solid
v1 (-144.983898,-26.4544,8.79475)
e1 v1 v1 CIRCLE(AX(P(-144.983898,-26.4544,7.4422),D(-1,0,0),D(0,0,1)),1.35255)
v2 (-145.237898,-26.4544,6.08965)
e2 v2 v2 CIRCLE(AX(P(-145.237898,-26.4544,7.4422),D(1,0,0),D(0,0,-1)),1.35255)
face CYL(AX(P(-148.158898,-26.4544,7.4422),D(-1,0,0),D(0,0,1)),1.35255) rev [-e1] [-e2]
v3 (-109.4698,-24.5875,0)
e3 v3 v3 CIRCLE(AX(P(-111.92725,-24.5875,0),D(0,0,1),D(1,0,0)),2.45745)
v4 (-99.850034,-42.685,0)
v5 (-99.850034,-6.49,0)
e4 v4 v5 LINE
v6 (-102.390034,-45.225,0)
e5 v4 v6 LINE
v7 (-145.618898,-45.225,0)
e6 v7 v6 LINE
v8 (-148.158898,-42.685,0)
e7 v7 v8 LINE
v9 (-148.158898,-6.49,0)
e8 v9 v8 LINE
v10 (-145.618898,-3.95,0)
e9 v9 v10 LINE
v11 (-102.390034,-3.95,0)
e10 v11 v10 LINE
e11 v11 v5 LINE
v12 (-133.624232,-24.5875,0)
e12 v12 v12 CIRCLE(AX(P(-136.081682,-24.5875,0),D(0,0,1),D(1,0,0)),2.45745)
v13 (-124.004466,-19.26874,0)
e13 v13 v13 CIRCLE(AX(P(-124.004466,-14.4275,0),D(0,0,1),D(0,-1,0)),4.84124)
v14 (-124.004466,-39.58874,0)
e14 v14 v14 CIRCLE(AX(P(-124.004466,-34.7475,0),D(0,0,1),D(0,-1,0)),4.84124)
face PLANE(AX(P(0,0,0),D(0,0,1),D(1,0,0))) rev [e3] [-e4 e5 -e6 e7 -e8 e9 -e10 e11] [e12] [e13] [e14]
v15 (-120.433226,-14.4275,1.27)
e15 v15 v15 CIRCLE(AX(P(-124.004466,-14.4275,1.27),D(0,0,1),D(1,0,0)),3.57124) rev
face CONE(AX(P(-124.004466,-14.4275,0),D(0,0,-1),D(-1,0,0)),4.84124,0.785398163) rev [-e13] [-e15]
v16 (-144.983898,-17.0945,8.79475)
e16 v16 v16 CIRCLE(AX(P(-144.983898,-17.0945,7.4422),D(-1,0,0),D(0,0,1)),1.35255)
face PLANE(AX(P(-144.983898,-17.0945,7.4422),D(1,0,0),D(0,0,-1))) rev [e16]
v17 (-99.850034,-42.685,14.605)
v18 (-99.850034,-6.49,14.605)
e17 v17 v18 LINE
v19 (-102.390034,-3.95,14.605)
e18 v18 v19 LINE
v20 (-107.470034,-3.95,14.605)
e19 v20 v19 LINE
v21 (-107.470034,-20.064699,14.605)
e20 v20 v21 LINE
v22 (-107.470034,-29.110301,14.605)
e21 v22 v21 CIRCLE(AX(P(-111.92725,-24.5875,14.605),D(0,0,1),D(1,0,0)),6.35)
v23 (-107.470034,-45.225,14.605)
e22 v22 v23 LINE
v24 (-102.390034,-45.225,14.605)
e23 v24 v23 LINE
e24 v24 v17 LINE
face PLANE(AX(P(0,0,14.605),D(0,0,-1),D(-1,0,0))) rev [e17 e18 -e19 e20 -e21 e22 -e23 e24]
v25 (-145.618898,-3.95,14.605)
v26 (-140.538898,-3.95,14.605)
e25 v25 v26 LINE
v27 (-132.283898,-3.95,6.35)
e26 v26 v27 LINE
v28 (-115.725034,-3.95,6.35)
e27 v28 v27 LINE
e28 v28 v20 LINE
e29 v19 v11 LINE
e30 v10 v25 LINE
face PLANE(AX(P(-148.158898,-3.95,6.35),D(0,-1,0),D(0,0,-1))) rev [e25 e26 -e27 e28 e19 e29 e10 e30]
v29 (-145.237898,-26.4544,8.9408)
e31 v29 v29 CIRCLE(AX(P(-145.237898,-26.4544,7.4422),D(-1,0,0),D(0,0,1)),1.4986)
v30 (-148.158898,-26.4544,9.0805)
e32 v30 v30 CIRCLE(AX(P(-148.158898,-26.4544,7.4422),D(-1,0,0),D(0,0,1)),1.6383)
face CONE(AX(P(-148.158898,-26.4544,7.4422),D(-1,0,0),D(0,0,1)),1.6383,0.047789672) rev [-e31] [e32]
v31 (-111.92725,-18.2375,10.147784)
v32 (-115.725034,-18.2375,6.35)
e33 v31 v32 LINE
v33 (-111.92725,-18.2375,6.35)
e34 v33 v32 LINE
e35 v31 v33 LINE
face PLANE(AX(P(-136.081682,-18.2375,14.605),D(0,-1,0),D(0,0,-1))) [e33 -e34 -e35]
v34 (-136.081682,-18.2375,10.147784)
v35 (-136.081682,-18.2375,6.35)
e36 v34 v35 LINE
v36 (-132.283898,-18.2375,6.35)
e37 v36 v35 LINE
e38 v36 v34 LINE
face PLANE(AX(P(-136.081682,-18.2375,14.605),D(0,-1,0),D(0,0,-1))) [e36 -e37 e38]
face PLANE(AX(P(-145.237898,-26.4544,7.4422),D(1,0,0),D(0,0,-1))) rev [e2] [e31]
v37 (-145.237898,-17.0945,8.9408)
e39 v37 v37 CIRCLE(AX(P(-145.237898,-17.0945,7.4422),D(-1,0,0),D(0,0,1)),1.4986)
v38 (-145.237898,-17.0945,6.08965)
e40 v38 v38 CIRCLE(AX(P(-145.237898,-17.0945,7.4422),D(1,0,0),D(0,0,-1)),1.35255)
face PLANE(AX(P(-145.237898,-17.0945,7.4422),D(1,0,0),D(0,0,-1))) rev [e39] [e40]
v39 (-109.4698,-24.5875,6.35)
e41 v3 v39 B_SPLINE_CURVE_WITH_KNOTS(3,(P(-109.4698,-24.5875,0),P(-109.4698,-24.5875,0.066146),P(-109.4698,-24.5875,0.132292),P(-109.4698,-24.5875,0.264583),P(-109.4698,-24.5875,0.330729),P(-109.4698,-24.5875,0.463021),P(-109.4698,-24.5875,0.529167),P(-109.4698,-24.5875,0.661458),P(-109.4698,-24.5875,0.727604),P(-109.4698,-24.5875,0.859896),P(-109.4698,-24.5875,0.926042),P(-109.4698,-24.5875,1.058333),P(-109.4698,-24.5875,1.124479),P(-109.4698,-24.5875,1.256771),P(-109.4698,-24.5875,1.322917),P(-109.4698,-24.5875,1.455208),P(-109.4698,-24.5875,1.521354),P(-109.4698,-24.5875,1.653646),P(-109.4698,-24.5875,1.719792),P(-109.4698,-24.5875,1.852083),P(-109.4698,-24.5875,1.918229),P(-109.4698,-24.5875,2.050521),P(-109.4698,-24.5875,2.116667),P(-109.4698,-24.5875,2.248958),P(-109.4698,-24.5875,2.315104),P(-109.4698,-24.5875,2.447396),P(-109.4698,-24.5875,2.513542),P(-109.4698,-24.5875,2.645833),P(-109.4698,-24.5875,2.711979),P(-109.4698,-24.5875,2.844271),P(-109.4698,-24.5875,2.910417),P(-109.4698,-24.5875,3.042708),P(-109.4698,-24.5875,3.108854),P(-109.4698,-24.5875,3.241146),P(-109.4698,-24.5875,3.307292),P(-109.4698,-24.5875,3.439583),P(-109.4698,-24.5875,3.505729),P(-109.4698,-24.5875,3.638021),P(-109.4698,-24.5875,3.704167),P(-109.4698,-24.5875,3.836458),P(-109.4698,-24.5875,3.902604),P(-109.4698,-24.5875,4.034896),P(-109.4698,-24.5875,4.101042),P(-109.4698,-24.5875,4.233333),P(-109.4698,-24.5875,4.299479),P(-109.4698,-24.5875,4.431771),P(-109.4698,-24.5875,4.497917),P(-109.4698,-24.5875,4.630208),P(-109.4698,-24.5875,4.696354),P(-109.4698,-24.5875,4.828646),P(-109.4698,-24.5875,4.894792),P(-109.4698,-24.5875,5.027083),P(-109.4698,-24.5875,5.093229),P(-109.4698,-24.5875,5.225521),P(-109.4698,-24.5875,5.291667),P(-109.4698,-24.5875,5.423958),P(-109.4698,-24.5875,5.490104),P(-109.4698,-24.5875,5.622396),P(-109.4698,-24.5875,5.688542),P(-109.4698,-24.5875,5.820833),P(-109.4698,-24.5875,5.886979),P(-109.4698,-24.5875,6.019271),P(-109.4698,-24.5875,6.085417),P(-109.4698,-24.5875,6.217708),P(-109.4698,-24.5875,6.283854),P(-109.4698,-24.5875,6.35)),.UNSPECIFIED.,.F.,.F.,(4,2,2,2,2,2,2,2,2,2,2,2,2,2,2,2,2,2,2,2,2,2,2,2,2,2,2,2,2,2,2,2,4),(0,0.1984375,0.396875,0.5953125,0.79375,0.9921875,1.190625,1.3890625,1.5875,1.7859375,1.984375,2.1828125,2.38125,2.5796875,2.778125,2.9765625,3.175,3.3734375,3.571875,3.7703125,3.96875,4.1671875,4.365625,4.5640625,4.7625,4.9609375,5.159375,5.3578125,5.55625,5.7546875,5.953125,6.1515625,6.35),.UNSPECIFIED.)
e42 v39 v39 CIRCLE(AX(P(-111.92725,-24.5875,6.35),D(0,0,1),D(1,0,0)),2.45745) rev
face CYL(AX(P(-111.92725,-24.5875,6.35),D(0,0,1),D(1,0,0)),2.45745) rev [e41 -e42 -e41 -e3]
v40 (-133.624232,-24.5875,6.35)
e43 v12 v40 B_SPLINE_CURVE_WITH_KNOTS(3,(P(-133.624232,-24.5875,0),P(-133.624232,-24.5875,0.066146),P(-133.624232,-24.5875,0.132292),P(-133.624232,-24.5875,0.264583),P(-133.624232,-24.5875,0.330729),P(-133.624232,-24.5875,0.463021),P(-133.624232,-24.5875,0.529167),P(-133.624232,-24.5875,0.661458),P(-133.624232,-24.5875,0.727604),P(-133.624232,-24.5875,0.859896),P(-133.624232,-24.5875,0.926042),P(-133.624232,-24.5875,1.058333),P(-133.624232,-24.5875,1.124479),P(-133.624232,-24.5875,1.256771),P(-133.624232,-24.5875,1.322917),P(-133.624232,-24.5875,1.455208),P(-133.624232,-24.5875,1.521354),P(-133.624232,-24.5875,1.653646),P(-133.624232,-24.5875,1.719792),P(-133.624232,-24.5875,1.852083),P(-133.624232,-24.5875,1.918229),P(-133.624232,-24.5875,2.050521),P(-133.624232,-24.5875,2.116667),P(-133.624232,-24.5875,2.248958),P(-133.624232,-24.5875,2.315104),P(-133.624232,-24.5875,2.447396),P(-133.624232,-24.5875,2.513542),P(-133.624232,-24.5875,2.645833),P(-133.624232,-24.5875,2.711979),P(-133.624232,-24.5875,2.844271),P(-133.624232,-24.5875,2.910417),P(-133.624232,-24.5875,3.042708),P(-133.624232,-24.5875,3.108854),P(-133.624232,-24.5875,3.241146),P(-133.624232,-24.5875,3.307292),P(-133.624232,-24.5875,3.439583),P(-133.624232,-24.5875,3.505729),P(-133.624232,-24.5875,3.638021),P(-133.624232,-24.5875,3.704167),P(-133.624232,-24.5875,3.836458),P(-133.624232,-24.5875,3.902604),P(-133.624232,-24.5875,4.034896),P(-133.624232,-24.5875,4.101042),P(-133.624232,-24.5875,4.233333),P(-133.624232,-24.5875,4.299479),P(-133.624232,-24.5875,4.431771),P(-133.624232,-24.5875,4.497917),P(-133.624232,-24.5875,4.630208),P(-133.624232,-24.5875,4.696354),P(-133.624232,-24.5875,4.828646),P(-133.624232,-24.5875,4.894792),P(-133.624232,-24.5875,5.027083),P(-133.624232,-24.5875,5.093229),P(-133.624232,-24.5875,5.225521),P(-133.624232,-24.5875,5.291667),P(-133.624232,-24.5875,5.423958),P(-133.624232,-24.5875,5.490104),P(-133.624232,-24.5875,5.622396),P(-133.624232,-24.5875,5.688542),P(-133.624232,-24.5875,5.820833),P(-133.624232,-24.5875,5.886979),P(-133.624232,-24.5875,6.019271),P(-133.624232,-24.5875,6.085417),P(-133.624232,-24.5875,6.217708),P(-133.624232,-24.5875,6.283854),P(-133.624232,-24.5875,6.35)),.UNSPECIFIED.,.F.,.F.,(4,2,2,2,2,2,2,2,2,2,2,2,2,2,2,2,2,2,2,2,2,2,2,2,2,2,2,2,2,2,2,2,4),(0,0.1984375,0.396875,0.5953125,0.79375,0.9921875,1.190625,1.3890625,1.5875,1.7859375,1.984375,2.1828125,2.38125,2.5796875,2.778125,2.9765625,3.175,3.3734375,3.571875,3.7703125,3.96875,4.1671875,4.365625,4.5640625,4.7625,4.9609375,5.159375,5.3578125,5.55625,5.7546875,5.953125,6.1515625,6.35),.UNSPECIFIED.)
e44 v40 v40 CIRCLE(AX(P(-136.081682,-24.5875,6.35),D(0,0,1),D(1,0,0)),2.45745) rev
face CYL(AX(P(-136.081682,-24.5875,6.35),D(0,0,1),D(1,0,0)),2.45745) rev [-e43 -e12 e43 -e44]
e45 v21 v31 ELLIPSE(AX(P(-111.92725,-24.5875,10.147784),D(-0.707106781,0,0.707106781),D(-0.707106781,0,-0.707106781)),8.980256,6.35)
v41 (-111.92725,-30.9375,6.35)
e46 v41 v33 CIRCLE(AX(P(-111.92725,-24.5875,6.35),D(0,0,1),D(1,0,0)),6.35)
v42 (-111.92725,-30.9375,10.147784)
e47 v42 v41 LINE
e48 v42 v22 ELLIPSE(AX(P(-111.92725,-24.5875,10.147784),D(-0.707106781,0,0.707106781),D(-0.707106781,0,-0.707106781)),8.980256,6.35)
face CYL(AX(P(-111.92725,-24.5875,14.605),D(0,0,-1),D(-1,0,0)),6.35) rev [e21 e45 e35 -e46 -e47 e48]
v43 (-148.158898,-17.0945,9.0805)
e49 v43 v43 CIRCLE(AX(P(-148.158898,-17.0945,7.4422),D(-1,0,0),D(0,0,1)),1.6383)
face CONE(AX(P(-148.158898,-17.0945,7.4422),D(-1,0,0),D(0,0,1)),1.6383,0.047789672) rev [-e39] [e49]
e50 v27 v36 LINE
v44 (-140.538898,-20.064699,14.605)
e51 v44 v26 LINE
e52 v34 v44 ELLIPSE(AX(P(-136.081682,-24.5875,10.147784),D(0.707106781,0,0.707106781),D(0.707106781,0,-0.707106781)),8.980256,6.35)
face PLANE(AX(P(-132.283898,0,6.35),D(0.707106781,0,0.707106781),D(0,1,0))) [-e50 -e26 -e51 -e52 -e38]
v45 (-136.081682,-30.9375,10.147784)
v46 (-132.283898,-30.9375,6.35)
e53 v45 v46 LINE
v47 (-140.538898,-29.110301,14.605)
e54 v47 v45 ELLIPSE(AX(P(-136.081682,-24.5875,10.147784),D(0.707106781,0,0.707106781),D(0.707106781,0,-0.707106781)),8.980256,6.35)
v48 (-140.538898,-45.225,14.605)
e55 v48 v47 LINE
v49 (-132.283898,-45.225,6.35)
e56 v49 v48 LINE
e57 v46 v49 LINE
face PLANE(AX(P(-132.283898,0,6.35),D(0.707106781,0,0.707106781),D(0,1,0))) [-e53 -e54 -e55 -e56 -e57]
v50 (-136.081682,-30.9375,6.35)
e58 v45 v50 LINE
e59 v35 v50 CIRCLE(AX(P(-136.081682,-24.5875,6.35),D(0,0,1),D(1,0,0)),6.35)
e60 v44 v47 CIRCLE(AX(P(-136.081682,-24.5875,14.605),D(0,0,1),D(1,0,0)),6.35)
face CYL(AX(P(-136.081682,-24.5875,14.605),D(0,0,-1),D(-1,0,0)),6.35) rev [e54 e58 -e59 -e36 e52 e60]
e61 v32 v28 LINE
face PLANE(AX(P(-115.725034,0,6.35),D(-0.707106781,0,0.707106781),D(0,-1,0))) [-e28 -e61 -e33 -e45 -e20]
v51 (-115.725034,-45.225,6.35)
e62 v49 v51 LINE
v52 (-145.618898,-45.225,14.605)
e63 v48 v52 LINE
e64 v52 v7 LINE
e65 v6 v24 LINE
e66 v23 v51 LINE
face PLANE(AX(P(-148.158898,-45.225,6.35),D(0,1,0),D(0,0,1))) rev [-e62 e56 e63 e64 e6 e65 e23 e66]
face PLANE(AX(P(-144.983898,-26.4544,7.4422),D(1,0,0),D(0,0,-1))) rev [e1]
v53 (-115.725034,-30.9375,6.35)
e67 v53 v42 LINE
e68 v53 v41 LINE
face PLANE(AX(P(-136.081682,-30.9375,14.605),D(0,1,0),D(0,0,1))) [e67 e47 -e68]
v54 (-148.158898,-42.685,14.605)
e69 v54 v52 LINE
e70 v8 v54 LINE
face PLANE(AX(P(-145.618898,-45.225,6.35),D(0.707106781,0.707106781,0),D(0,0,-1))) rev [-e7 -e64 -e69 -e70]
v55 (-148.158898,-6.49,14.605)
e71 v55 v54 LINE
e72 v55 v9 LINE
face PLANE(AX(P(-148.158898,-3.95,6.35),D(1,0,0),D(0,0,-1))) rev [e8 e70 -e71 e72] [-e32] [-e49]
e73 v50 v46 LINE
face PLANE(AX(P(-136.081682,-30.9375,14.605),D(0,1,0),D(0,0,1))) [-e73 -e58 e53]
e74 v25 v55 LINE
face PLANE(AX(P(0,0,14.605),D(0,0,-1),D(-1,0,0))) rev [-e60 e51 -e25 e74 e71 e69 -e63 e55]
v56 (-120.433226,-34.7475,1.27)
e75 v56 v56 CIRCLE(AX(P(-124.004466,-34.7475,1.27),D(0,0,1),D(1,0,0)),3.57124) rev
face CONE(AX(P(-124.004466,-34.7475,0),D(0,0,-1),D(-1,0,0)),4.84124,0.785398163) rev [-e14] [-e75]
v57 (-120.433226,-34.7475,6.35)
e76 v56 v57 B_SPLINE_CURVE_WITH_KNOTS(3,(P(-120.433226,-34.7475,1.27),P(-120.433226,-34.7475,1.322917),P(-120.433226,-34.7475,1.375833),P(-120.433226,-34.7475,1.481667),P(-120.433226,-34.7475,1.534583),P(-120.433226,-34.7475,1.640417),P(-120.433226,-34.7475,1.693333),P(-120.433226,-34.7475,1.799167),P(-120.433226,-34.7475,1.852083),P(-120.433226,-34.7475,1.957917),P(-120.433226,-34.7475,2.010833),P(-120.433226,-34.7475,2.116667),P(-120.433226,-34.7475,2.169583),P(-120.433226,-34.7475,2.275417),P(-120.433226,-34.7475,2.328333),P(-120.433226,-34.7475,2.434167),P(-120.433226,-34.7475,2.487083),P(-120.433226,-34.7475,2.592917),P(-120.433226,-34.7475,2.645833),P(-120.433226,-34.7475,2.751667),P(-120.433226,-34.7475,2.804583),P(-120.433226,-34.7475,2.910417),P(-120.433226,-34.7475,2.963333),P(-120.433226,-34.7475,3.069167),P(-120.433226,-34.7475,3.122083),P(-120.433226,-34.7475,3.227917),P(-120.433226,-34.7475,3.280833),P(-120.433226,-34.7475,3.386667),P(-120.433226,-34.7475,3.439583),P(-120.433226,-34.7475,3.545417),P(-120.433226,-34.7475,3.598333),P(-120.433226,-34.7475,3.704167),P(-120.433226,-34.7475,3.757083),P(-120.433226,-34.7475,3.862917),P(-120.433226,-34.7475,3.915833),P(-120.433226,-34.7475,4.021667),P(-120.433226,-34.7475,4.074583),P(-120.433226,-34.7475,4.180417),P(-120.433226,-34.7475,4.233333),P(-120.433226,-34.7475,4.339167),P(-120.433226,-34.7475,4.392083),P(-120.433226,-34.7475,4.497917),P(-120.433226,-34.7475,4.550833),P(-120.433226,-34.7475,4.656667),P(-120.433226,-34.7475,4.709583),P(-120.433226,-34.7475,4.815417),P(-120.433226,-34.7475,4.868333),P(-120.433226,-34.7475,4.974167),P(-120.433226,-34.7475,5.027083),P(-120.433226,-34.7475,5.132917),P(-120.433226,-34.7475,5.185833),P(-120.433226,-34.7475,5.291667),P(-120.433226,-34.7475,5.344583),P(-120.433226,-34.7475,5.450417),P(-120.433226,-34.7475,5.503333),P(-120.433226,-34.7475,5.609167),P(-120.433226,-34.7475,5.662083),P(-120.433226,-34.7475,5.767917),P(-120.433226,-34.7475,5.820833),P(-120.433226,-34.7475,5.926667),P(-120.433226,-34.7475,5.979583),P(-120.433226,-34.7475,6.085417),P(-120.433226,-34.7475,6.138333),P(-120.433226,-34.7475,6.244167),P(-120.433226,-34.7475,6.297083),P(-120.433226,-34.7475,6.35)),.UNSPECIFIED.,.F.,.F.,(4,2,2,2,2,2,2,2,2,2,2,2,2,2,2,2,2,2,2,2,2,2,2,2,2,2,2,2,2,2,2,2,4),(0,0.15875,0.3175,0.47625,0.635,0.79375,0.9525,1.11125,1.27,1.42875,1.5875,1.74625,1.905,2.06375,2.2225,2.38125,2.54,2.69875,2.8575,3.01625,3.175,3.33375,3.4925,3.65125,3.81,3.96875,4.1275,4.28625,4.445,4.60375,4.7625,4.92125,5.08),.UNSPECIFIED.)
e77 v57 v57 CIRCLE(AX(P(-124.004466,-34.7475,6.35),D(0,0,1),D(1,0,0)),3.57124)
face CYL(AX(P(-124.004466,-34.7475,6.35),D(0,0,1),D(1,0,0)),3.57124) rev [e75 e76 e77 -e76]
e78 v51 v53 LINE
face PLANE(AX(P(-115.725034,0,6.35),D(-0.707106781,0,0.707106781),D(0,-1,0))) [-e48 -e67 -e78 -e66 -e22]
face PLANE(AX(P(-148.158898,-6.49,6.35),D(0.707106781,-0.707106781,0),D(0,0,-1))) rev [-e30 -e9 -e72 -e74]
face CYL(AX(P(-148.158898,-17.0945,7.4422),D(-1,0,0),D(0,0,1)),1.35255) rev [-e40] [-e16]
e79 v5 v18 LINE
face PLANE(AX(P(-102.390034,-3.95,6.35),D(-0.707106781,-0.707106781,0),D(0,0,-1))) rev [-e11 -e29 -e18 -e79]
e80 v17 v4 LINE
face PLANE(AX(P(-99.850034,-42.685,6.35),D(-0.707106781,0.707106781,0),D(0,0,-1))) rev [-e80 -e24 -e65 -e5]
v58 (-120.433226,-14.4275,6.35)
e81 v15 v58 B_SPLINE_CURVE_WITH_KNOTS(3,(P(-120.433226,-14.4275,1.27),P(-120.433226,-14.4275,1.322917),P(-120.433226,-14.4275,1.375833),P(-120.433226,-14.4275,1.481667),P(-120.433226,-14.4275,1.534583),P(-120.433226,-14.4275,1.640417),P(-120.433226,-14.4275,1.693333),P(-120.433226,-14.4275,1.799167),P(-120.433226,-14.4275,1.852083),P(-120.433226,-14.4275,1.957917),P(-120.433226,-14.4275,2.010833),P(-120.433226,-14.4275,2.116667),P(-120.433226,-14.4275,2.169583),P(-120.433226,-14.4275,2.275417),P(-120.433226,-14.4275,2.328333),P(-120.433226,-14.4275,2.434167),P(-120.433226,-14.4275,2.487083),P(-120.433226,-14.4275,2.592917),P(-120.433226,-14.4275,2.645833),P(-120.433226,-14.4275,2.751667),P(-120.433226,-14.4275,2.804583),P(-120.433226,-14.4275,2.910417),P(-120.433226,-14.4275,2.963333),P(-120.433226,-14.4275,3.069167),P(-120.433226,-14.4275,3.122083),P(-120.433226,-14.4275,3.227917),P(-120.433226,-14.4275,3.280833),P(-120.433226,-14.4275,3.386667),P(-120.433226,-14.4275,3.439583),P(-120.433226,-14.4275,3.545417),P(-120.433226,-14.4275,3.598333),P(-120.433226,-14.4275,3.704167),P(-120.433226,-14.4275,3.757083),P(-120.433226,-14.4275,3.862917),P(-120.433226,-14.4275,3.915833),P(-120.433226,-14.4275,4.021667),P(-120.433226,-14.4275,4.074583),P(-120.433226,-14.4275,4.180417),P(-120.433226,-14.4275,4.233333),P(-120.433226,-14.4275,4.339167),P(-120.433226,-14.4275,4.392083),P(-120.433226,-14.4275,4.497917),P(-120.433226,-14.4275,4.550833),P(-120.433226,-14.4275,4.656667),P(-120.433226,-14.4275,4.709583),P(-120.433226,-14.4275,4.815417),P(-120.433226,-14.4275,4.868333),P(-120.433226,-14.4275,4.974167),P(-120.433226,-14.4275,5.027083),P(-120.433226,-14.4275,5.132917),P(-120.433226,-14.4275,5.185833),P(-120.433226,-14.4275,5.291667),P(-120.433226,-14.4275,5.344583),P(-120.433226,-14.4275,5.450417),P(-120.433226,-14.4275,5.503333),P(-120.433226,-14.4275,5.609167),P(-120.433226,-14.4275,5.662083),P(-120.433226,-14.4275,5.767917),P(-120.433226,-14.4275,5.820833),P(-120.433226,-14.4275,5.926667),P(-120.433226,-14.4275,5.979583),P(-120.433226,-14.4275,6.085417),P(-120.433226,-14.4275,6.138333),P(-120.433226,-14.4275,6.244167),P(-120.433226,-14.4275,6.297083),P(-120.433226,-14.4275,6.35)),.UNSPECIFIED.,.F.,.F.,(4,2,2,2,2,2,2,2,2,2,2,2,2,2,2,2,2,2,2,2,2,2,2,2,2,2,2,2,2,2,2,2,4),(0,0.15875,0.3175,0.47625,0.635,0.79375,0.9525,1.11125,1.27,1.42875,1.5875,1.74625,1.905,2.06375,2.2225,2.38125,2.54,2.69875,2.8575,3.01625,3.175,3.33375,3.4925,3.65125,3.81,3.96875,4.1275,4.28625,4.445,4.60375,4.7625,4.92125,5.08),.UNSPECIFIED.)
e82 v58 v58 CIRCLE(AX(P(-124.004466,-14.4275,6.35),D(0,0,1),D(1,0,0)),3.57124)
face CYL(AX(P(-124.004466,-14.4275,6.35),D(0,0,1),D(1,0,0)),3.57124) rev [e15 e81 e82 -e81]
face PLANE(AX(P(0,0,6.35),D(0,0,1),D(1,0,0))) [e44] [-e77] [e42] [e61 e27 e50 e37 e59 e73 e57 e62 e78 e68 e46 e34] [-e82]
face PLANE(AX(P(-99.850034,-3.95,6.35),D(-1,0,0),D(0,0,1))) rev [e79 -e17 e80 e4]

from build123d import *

# Parameters (mm, degrees)
SKETCH1_W                 = 48.308864232
SKETCH1_H                 = 41.275
BOSS_EXTRUDE1_DEPTH       = 6.35
F_8_CLEARANCE_HOLE1_D     = 4.9149
F_1_4_CLEARANCE_HOLE1_D   = 7.14248
SKETCH9_W                 = 6.35
SKETCH9_H                 = 41.275
EXTRUDE_THIN1_DEPTH       = 8.255
CHAMFER2_SIZE             = 9.525
CUT_EXTRUDE1_DEPTH        = 156.127382276
CHAMFER1_SIZE             = 2.54
HOLE1_AT_2_COUNT          = 2
HOLE1_AT_2_PITCH          = 9.3599
F_2_CLEARANCE_HOLE1_D     = 2.7051
F_2_CLEARANCE_HOLE1_DEPTH = 3.175
CHAMFER3_SIZE             = 1.27


with BuildPart() as part:
    # Sketch1 → Boss-Extrude1 (new body)
    with BuildSketch(Plane.XY):
        with Locations((-124.004465969, -24.5875)):
            Rectangle(SKETCH1_W, SKETCH1_H)
    extrude(amount=BOSS_EXTRUDE1_DEPTH)

    # #8 Clearance Hole1 (through all)
    with Locations(Plane.XY.offset(6.35)):
        with Locations((-111.927249911, -24.5875), (-136.081682027, -24.5875)):
            Hole(F_8_CLEARANCE_HOLE1_D / 2)

    # 1/4 Clearance Hole1 (through all)
    with Locations(Plane.XY.offset(6.35)):
        with Locations((-124.004465969, -14.4275), (-124.004465969, -34.7475)):
            Hole(F_1_4_CLEARANCE_HOLE1_D / 2)

    # Sketch9 → Extrude-Thin1 (add)
    with BuildSketch(Plane.XY.offset(6.35)):
        with Locations((-103.025033853, -24.5875)):
            Rectangle(SKETCH9_W, SKETCH9_H)
        with Locations((-144.983898085, -24.5875)):
            Rectangle(SKETCH9_W, SKETCH9_H)
    extrude(amount=EXTRUDE_THIN1_DEPTH)

    # Chamfer2
    # the kernel refuses this chamfer: 9.525 mm, written as the material it adds along each edge
    with BuildSketch(Plane(origin=(-106.200033853, -3.95, 6.35), x_dir=(0.0274958766105871, 0, 0.9996219169112966), z_dir=(0, -1, 0))) as chamfer2_piece_1_section:
        Polygon((CHAMFER2_SIZE * 0.999621916911, CHAMFER2_SIZE * 0.0274958766106), (-CHAMFER2_SIZE * 0.0274958766106, CHAMFER2_SIZE * 0.999621916911), (0, 0), align=None)
    chamfer2_piece_1 = extrude(amount=41.275, mode=Mode.PRIVATE)
    chamfer2_piece_1 = chamfer2_piece_1 - Plane(origin=(-111.927249911, -24.5875, 9.368765613), x_dir=(-1, 0, 0), z_dir=(0, 0, -1)) * Cylinder(2.45745, 121, mode=Mode.PRIVATE)
    chamfer2_piece_1 = split(chamfer2_piece_1, bisect_by=Plane(origin=(-109.341812124, -24.58749874, 14.605), z_dir=(0, 0, -1)), keep=Keep.TOP, mode=Mode.PRIVATE)
    add(chamfer2_piece_1)
    with BuildSketch(Plane(origin=(-141.808898085, -45.225, 6.35), x_dir=(0.9996219169112968, 0, -0.027495876610586386), z_dir=(0, 1, 0))) as chamfer2_piece_2_section:
        Polygon((CHAMFER2_SIZE * 0.999621916911, -CHAMFER2_SIZE * 0.0274958766106), (-CHAMFER2_SIZE * 0.0274958766106, -CHAMFER2_SIZE * 0.999621916911), (0, 0), align=None)
    chamfer2_piece_2 = extrude(amount=41.275, mode=Mode.PRIVATE)
    chamfer2_piece_2 = chamfer2_piece_2 - Plane(origin=(-136.081682027, -24.5875, 9.368765819), x_dir=(-1, 0, 0), z_dir=(0, 0, -1)) * Cylinder(2.45745, 121, mode=Mode.PRIVATE)
    chamfer2_piece_2 = split(chamfer2_piece_2, bisect_by=Plane(origin=(-138.667118685, -24.587501904, 14.605), z_dir=(0, 0, -1)), keep=Keep.TOP, mode=Mode.PRIVATE)
    add(chamfer2_piece_2)

    # Sketch10 → Cut-Extrude1 (cut, through all)
    with BuildSketch(Plane.XY.offset(6.35)):
        with BuildLine():
            Line((-136.081682027, -18.2375), (-111.927249911, -18.2375))
            ThreePointArc((-111.927249911, -18.2375), (-105.577249911, -24.5875), (-111.927249911, -30.9375))
            Line((-111.927249911, -30.9375), (-136.081682027, -30.9375))
            ThreePointArc((-136.081682027, -30.9375), (-142.431682027, -24.5875), (-136.081682027, -18.2375))
        make_face()
    extrude(amount=CUT_EXTRUDE1_DEPTH, mode=Mode.SUBTRACT)

    # Chamfer1
    chamfer1_edges = [part.edges().sort_by_distance(p)[0] for p in [
        (-99.850033853, -45.225, 7.3025),
        (-148.158898085, -45.225, 7.3025),
        (-148.158898085, -3.95, 7.3025),
        (-99.850033853, -3.95, 7.3025),
    ]]
    chamfer(chamfer1_edges, length=CHAMFER1_SIZE)

    # Sketch12 → Hole1 (revolve, cut)
    with BuildSketch(Plane(origin=(-148.158898085, -26.4544, 7.4422), x_dir=(0, 0, 1), z_dir=(0, 1, 0))):
        Polygon((0, 0), (0, 2.921), (1.4986, 2.921), (1.6383, 0), align=None)
    hole1 = revolve(axis=Axis((-38.158898085, -26.4544, 7.4422), (-1, 0, 0)), mode=Mode.SUBTRACT)

    # Hole1 at 2: Hole1 ×2
    with Locations(*[(0, i * HOLE1_AT_2_PITCH, 0) for i in range(1, HOLE1_AT_2_COUNT)]):
        add(hole1, mode=Mode.SUBTRACT)

    # #2 Clearance Hole1
    with Locations(Plane.ZY.offset(148.158898085)):
        with Locations((7.4422, -17.0945), (7.4422, -26.4544)):
            Hole(F_2_CLEARANCE_HOLE1_D / 2, depth=F_2_CLEARANCE_HOLE1_DEPTH)

    # Chamfer3
    chamfer3_edges = [part.edges().sort_by_distance(p)[0] for p in [
        (-120.433225969, -34.7475, 0),
        (-120.433225969, -14.4275, 0),
    ]]
    chamfer(chamfer3_edges, length=CHAMFER3_SIZE)


solid = part.part
